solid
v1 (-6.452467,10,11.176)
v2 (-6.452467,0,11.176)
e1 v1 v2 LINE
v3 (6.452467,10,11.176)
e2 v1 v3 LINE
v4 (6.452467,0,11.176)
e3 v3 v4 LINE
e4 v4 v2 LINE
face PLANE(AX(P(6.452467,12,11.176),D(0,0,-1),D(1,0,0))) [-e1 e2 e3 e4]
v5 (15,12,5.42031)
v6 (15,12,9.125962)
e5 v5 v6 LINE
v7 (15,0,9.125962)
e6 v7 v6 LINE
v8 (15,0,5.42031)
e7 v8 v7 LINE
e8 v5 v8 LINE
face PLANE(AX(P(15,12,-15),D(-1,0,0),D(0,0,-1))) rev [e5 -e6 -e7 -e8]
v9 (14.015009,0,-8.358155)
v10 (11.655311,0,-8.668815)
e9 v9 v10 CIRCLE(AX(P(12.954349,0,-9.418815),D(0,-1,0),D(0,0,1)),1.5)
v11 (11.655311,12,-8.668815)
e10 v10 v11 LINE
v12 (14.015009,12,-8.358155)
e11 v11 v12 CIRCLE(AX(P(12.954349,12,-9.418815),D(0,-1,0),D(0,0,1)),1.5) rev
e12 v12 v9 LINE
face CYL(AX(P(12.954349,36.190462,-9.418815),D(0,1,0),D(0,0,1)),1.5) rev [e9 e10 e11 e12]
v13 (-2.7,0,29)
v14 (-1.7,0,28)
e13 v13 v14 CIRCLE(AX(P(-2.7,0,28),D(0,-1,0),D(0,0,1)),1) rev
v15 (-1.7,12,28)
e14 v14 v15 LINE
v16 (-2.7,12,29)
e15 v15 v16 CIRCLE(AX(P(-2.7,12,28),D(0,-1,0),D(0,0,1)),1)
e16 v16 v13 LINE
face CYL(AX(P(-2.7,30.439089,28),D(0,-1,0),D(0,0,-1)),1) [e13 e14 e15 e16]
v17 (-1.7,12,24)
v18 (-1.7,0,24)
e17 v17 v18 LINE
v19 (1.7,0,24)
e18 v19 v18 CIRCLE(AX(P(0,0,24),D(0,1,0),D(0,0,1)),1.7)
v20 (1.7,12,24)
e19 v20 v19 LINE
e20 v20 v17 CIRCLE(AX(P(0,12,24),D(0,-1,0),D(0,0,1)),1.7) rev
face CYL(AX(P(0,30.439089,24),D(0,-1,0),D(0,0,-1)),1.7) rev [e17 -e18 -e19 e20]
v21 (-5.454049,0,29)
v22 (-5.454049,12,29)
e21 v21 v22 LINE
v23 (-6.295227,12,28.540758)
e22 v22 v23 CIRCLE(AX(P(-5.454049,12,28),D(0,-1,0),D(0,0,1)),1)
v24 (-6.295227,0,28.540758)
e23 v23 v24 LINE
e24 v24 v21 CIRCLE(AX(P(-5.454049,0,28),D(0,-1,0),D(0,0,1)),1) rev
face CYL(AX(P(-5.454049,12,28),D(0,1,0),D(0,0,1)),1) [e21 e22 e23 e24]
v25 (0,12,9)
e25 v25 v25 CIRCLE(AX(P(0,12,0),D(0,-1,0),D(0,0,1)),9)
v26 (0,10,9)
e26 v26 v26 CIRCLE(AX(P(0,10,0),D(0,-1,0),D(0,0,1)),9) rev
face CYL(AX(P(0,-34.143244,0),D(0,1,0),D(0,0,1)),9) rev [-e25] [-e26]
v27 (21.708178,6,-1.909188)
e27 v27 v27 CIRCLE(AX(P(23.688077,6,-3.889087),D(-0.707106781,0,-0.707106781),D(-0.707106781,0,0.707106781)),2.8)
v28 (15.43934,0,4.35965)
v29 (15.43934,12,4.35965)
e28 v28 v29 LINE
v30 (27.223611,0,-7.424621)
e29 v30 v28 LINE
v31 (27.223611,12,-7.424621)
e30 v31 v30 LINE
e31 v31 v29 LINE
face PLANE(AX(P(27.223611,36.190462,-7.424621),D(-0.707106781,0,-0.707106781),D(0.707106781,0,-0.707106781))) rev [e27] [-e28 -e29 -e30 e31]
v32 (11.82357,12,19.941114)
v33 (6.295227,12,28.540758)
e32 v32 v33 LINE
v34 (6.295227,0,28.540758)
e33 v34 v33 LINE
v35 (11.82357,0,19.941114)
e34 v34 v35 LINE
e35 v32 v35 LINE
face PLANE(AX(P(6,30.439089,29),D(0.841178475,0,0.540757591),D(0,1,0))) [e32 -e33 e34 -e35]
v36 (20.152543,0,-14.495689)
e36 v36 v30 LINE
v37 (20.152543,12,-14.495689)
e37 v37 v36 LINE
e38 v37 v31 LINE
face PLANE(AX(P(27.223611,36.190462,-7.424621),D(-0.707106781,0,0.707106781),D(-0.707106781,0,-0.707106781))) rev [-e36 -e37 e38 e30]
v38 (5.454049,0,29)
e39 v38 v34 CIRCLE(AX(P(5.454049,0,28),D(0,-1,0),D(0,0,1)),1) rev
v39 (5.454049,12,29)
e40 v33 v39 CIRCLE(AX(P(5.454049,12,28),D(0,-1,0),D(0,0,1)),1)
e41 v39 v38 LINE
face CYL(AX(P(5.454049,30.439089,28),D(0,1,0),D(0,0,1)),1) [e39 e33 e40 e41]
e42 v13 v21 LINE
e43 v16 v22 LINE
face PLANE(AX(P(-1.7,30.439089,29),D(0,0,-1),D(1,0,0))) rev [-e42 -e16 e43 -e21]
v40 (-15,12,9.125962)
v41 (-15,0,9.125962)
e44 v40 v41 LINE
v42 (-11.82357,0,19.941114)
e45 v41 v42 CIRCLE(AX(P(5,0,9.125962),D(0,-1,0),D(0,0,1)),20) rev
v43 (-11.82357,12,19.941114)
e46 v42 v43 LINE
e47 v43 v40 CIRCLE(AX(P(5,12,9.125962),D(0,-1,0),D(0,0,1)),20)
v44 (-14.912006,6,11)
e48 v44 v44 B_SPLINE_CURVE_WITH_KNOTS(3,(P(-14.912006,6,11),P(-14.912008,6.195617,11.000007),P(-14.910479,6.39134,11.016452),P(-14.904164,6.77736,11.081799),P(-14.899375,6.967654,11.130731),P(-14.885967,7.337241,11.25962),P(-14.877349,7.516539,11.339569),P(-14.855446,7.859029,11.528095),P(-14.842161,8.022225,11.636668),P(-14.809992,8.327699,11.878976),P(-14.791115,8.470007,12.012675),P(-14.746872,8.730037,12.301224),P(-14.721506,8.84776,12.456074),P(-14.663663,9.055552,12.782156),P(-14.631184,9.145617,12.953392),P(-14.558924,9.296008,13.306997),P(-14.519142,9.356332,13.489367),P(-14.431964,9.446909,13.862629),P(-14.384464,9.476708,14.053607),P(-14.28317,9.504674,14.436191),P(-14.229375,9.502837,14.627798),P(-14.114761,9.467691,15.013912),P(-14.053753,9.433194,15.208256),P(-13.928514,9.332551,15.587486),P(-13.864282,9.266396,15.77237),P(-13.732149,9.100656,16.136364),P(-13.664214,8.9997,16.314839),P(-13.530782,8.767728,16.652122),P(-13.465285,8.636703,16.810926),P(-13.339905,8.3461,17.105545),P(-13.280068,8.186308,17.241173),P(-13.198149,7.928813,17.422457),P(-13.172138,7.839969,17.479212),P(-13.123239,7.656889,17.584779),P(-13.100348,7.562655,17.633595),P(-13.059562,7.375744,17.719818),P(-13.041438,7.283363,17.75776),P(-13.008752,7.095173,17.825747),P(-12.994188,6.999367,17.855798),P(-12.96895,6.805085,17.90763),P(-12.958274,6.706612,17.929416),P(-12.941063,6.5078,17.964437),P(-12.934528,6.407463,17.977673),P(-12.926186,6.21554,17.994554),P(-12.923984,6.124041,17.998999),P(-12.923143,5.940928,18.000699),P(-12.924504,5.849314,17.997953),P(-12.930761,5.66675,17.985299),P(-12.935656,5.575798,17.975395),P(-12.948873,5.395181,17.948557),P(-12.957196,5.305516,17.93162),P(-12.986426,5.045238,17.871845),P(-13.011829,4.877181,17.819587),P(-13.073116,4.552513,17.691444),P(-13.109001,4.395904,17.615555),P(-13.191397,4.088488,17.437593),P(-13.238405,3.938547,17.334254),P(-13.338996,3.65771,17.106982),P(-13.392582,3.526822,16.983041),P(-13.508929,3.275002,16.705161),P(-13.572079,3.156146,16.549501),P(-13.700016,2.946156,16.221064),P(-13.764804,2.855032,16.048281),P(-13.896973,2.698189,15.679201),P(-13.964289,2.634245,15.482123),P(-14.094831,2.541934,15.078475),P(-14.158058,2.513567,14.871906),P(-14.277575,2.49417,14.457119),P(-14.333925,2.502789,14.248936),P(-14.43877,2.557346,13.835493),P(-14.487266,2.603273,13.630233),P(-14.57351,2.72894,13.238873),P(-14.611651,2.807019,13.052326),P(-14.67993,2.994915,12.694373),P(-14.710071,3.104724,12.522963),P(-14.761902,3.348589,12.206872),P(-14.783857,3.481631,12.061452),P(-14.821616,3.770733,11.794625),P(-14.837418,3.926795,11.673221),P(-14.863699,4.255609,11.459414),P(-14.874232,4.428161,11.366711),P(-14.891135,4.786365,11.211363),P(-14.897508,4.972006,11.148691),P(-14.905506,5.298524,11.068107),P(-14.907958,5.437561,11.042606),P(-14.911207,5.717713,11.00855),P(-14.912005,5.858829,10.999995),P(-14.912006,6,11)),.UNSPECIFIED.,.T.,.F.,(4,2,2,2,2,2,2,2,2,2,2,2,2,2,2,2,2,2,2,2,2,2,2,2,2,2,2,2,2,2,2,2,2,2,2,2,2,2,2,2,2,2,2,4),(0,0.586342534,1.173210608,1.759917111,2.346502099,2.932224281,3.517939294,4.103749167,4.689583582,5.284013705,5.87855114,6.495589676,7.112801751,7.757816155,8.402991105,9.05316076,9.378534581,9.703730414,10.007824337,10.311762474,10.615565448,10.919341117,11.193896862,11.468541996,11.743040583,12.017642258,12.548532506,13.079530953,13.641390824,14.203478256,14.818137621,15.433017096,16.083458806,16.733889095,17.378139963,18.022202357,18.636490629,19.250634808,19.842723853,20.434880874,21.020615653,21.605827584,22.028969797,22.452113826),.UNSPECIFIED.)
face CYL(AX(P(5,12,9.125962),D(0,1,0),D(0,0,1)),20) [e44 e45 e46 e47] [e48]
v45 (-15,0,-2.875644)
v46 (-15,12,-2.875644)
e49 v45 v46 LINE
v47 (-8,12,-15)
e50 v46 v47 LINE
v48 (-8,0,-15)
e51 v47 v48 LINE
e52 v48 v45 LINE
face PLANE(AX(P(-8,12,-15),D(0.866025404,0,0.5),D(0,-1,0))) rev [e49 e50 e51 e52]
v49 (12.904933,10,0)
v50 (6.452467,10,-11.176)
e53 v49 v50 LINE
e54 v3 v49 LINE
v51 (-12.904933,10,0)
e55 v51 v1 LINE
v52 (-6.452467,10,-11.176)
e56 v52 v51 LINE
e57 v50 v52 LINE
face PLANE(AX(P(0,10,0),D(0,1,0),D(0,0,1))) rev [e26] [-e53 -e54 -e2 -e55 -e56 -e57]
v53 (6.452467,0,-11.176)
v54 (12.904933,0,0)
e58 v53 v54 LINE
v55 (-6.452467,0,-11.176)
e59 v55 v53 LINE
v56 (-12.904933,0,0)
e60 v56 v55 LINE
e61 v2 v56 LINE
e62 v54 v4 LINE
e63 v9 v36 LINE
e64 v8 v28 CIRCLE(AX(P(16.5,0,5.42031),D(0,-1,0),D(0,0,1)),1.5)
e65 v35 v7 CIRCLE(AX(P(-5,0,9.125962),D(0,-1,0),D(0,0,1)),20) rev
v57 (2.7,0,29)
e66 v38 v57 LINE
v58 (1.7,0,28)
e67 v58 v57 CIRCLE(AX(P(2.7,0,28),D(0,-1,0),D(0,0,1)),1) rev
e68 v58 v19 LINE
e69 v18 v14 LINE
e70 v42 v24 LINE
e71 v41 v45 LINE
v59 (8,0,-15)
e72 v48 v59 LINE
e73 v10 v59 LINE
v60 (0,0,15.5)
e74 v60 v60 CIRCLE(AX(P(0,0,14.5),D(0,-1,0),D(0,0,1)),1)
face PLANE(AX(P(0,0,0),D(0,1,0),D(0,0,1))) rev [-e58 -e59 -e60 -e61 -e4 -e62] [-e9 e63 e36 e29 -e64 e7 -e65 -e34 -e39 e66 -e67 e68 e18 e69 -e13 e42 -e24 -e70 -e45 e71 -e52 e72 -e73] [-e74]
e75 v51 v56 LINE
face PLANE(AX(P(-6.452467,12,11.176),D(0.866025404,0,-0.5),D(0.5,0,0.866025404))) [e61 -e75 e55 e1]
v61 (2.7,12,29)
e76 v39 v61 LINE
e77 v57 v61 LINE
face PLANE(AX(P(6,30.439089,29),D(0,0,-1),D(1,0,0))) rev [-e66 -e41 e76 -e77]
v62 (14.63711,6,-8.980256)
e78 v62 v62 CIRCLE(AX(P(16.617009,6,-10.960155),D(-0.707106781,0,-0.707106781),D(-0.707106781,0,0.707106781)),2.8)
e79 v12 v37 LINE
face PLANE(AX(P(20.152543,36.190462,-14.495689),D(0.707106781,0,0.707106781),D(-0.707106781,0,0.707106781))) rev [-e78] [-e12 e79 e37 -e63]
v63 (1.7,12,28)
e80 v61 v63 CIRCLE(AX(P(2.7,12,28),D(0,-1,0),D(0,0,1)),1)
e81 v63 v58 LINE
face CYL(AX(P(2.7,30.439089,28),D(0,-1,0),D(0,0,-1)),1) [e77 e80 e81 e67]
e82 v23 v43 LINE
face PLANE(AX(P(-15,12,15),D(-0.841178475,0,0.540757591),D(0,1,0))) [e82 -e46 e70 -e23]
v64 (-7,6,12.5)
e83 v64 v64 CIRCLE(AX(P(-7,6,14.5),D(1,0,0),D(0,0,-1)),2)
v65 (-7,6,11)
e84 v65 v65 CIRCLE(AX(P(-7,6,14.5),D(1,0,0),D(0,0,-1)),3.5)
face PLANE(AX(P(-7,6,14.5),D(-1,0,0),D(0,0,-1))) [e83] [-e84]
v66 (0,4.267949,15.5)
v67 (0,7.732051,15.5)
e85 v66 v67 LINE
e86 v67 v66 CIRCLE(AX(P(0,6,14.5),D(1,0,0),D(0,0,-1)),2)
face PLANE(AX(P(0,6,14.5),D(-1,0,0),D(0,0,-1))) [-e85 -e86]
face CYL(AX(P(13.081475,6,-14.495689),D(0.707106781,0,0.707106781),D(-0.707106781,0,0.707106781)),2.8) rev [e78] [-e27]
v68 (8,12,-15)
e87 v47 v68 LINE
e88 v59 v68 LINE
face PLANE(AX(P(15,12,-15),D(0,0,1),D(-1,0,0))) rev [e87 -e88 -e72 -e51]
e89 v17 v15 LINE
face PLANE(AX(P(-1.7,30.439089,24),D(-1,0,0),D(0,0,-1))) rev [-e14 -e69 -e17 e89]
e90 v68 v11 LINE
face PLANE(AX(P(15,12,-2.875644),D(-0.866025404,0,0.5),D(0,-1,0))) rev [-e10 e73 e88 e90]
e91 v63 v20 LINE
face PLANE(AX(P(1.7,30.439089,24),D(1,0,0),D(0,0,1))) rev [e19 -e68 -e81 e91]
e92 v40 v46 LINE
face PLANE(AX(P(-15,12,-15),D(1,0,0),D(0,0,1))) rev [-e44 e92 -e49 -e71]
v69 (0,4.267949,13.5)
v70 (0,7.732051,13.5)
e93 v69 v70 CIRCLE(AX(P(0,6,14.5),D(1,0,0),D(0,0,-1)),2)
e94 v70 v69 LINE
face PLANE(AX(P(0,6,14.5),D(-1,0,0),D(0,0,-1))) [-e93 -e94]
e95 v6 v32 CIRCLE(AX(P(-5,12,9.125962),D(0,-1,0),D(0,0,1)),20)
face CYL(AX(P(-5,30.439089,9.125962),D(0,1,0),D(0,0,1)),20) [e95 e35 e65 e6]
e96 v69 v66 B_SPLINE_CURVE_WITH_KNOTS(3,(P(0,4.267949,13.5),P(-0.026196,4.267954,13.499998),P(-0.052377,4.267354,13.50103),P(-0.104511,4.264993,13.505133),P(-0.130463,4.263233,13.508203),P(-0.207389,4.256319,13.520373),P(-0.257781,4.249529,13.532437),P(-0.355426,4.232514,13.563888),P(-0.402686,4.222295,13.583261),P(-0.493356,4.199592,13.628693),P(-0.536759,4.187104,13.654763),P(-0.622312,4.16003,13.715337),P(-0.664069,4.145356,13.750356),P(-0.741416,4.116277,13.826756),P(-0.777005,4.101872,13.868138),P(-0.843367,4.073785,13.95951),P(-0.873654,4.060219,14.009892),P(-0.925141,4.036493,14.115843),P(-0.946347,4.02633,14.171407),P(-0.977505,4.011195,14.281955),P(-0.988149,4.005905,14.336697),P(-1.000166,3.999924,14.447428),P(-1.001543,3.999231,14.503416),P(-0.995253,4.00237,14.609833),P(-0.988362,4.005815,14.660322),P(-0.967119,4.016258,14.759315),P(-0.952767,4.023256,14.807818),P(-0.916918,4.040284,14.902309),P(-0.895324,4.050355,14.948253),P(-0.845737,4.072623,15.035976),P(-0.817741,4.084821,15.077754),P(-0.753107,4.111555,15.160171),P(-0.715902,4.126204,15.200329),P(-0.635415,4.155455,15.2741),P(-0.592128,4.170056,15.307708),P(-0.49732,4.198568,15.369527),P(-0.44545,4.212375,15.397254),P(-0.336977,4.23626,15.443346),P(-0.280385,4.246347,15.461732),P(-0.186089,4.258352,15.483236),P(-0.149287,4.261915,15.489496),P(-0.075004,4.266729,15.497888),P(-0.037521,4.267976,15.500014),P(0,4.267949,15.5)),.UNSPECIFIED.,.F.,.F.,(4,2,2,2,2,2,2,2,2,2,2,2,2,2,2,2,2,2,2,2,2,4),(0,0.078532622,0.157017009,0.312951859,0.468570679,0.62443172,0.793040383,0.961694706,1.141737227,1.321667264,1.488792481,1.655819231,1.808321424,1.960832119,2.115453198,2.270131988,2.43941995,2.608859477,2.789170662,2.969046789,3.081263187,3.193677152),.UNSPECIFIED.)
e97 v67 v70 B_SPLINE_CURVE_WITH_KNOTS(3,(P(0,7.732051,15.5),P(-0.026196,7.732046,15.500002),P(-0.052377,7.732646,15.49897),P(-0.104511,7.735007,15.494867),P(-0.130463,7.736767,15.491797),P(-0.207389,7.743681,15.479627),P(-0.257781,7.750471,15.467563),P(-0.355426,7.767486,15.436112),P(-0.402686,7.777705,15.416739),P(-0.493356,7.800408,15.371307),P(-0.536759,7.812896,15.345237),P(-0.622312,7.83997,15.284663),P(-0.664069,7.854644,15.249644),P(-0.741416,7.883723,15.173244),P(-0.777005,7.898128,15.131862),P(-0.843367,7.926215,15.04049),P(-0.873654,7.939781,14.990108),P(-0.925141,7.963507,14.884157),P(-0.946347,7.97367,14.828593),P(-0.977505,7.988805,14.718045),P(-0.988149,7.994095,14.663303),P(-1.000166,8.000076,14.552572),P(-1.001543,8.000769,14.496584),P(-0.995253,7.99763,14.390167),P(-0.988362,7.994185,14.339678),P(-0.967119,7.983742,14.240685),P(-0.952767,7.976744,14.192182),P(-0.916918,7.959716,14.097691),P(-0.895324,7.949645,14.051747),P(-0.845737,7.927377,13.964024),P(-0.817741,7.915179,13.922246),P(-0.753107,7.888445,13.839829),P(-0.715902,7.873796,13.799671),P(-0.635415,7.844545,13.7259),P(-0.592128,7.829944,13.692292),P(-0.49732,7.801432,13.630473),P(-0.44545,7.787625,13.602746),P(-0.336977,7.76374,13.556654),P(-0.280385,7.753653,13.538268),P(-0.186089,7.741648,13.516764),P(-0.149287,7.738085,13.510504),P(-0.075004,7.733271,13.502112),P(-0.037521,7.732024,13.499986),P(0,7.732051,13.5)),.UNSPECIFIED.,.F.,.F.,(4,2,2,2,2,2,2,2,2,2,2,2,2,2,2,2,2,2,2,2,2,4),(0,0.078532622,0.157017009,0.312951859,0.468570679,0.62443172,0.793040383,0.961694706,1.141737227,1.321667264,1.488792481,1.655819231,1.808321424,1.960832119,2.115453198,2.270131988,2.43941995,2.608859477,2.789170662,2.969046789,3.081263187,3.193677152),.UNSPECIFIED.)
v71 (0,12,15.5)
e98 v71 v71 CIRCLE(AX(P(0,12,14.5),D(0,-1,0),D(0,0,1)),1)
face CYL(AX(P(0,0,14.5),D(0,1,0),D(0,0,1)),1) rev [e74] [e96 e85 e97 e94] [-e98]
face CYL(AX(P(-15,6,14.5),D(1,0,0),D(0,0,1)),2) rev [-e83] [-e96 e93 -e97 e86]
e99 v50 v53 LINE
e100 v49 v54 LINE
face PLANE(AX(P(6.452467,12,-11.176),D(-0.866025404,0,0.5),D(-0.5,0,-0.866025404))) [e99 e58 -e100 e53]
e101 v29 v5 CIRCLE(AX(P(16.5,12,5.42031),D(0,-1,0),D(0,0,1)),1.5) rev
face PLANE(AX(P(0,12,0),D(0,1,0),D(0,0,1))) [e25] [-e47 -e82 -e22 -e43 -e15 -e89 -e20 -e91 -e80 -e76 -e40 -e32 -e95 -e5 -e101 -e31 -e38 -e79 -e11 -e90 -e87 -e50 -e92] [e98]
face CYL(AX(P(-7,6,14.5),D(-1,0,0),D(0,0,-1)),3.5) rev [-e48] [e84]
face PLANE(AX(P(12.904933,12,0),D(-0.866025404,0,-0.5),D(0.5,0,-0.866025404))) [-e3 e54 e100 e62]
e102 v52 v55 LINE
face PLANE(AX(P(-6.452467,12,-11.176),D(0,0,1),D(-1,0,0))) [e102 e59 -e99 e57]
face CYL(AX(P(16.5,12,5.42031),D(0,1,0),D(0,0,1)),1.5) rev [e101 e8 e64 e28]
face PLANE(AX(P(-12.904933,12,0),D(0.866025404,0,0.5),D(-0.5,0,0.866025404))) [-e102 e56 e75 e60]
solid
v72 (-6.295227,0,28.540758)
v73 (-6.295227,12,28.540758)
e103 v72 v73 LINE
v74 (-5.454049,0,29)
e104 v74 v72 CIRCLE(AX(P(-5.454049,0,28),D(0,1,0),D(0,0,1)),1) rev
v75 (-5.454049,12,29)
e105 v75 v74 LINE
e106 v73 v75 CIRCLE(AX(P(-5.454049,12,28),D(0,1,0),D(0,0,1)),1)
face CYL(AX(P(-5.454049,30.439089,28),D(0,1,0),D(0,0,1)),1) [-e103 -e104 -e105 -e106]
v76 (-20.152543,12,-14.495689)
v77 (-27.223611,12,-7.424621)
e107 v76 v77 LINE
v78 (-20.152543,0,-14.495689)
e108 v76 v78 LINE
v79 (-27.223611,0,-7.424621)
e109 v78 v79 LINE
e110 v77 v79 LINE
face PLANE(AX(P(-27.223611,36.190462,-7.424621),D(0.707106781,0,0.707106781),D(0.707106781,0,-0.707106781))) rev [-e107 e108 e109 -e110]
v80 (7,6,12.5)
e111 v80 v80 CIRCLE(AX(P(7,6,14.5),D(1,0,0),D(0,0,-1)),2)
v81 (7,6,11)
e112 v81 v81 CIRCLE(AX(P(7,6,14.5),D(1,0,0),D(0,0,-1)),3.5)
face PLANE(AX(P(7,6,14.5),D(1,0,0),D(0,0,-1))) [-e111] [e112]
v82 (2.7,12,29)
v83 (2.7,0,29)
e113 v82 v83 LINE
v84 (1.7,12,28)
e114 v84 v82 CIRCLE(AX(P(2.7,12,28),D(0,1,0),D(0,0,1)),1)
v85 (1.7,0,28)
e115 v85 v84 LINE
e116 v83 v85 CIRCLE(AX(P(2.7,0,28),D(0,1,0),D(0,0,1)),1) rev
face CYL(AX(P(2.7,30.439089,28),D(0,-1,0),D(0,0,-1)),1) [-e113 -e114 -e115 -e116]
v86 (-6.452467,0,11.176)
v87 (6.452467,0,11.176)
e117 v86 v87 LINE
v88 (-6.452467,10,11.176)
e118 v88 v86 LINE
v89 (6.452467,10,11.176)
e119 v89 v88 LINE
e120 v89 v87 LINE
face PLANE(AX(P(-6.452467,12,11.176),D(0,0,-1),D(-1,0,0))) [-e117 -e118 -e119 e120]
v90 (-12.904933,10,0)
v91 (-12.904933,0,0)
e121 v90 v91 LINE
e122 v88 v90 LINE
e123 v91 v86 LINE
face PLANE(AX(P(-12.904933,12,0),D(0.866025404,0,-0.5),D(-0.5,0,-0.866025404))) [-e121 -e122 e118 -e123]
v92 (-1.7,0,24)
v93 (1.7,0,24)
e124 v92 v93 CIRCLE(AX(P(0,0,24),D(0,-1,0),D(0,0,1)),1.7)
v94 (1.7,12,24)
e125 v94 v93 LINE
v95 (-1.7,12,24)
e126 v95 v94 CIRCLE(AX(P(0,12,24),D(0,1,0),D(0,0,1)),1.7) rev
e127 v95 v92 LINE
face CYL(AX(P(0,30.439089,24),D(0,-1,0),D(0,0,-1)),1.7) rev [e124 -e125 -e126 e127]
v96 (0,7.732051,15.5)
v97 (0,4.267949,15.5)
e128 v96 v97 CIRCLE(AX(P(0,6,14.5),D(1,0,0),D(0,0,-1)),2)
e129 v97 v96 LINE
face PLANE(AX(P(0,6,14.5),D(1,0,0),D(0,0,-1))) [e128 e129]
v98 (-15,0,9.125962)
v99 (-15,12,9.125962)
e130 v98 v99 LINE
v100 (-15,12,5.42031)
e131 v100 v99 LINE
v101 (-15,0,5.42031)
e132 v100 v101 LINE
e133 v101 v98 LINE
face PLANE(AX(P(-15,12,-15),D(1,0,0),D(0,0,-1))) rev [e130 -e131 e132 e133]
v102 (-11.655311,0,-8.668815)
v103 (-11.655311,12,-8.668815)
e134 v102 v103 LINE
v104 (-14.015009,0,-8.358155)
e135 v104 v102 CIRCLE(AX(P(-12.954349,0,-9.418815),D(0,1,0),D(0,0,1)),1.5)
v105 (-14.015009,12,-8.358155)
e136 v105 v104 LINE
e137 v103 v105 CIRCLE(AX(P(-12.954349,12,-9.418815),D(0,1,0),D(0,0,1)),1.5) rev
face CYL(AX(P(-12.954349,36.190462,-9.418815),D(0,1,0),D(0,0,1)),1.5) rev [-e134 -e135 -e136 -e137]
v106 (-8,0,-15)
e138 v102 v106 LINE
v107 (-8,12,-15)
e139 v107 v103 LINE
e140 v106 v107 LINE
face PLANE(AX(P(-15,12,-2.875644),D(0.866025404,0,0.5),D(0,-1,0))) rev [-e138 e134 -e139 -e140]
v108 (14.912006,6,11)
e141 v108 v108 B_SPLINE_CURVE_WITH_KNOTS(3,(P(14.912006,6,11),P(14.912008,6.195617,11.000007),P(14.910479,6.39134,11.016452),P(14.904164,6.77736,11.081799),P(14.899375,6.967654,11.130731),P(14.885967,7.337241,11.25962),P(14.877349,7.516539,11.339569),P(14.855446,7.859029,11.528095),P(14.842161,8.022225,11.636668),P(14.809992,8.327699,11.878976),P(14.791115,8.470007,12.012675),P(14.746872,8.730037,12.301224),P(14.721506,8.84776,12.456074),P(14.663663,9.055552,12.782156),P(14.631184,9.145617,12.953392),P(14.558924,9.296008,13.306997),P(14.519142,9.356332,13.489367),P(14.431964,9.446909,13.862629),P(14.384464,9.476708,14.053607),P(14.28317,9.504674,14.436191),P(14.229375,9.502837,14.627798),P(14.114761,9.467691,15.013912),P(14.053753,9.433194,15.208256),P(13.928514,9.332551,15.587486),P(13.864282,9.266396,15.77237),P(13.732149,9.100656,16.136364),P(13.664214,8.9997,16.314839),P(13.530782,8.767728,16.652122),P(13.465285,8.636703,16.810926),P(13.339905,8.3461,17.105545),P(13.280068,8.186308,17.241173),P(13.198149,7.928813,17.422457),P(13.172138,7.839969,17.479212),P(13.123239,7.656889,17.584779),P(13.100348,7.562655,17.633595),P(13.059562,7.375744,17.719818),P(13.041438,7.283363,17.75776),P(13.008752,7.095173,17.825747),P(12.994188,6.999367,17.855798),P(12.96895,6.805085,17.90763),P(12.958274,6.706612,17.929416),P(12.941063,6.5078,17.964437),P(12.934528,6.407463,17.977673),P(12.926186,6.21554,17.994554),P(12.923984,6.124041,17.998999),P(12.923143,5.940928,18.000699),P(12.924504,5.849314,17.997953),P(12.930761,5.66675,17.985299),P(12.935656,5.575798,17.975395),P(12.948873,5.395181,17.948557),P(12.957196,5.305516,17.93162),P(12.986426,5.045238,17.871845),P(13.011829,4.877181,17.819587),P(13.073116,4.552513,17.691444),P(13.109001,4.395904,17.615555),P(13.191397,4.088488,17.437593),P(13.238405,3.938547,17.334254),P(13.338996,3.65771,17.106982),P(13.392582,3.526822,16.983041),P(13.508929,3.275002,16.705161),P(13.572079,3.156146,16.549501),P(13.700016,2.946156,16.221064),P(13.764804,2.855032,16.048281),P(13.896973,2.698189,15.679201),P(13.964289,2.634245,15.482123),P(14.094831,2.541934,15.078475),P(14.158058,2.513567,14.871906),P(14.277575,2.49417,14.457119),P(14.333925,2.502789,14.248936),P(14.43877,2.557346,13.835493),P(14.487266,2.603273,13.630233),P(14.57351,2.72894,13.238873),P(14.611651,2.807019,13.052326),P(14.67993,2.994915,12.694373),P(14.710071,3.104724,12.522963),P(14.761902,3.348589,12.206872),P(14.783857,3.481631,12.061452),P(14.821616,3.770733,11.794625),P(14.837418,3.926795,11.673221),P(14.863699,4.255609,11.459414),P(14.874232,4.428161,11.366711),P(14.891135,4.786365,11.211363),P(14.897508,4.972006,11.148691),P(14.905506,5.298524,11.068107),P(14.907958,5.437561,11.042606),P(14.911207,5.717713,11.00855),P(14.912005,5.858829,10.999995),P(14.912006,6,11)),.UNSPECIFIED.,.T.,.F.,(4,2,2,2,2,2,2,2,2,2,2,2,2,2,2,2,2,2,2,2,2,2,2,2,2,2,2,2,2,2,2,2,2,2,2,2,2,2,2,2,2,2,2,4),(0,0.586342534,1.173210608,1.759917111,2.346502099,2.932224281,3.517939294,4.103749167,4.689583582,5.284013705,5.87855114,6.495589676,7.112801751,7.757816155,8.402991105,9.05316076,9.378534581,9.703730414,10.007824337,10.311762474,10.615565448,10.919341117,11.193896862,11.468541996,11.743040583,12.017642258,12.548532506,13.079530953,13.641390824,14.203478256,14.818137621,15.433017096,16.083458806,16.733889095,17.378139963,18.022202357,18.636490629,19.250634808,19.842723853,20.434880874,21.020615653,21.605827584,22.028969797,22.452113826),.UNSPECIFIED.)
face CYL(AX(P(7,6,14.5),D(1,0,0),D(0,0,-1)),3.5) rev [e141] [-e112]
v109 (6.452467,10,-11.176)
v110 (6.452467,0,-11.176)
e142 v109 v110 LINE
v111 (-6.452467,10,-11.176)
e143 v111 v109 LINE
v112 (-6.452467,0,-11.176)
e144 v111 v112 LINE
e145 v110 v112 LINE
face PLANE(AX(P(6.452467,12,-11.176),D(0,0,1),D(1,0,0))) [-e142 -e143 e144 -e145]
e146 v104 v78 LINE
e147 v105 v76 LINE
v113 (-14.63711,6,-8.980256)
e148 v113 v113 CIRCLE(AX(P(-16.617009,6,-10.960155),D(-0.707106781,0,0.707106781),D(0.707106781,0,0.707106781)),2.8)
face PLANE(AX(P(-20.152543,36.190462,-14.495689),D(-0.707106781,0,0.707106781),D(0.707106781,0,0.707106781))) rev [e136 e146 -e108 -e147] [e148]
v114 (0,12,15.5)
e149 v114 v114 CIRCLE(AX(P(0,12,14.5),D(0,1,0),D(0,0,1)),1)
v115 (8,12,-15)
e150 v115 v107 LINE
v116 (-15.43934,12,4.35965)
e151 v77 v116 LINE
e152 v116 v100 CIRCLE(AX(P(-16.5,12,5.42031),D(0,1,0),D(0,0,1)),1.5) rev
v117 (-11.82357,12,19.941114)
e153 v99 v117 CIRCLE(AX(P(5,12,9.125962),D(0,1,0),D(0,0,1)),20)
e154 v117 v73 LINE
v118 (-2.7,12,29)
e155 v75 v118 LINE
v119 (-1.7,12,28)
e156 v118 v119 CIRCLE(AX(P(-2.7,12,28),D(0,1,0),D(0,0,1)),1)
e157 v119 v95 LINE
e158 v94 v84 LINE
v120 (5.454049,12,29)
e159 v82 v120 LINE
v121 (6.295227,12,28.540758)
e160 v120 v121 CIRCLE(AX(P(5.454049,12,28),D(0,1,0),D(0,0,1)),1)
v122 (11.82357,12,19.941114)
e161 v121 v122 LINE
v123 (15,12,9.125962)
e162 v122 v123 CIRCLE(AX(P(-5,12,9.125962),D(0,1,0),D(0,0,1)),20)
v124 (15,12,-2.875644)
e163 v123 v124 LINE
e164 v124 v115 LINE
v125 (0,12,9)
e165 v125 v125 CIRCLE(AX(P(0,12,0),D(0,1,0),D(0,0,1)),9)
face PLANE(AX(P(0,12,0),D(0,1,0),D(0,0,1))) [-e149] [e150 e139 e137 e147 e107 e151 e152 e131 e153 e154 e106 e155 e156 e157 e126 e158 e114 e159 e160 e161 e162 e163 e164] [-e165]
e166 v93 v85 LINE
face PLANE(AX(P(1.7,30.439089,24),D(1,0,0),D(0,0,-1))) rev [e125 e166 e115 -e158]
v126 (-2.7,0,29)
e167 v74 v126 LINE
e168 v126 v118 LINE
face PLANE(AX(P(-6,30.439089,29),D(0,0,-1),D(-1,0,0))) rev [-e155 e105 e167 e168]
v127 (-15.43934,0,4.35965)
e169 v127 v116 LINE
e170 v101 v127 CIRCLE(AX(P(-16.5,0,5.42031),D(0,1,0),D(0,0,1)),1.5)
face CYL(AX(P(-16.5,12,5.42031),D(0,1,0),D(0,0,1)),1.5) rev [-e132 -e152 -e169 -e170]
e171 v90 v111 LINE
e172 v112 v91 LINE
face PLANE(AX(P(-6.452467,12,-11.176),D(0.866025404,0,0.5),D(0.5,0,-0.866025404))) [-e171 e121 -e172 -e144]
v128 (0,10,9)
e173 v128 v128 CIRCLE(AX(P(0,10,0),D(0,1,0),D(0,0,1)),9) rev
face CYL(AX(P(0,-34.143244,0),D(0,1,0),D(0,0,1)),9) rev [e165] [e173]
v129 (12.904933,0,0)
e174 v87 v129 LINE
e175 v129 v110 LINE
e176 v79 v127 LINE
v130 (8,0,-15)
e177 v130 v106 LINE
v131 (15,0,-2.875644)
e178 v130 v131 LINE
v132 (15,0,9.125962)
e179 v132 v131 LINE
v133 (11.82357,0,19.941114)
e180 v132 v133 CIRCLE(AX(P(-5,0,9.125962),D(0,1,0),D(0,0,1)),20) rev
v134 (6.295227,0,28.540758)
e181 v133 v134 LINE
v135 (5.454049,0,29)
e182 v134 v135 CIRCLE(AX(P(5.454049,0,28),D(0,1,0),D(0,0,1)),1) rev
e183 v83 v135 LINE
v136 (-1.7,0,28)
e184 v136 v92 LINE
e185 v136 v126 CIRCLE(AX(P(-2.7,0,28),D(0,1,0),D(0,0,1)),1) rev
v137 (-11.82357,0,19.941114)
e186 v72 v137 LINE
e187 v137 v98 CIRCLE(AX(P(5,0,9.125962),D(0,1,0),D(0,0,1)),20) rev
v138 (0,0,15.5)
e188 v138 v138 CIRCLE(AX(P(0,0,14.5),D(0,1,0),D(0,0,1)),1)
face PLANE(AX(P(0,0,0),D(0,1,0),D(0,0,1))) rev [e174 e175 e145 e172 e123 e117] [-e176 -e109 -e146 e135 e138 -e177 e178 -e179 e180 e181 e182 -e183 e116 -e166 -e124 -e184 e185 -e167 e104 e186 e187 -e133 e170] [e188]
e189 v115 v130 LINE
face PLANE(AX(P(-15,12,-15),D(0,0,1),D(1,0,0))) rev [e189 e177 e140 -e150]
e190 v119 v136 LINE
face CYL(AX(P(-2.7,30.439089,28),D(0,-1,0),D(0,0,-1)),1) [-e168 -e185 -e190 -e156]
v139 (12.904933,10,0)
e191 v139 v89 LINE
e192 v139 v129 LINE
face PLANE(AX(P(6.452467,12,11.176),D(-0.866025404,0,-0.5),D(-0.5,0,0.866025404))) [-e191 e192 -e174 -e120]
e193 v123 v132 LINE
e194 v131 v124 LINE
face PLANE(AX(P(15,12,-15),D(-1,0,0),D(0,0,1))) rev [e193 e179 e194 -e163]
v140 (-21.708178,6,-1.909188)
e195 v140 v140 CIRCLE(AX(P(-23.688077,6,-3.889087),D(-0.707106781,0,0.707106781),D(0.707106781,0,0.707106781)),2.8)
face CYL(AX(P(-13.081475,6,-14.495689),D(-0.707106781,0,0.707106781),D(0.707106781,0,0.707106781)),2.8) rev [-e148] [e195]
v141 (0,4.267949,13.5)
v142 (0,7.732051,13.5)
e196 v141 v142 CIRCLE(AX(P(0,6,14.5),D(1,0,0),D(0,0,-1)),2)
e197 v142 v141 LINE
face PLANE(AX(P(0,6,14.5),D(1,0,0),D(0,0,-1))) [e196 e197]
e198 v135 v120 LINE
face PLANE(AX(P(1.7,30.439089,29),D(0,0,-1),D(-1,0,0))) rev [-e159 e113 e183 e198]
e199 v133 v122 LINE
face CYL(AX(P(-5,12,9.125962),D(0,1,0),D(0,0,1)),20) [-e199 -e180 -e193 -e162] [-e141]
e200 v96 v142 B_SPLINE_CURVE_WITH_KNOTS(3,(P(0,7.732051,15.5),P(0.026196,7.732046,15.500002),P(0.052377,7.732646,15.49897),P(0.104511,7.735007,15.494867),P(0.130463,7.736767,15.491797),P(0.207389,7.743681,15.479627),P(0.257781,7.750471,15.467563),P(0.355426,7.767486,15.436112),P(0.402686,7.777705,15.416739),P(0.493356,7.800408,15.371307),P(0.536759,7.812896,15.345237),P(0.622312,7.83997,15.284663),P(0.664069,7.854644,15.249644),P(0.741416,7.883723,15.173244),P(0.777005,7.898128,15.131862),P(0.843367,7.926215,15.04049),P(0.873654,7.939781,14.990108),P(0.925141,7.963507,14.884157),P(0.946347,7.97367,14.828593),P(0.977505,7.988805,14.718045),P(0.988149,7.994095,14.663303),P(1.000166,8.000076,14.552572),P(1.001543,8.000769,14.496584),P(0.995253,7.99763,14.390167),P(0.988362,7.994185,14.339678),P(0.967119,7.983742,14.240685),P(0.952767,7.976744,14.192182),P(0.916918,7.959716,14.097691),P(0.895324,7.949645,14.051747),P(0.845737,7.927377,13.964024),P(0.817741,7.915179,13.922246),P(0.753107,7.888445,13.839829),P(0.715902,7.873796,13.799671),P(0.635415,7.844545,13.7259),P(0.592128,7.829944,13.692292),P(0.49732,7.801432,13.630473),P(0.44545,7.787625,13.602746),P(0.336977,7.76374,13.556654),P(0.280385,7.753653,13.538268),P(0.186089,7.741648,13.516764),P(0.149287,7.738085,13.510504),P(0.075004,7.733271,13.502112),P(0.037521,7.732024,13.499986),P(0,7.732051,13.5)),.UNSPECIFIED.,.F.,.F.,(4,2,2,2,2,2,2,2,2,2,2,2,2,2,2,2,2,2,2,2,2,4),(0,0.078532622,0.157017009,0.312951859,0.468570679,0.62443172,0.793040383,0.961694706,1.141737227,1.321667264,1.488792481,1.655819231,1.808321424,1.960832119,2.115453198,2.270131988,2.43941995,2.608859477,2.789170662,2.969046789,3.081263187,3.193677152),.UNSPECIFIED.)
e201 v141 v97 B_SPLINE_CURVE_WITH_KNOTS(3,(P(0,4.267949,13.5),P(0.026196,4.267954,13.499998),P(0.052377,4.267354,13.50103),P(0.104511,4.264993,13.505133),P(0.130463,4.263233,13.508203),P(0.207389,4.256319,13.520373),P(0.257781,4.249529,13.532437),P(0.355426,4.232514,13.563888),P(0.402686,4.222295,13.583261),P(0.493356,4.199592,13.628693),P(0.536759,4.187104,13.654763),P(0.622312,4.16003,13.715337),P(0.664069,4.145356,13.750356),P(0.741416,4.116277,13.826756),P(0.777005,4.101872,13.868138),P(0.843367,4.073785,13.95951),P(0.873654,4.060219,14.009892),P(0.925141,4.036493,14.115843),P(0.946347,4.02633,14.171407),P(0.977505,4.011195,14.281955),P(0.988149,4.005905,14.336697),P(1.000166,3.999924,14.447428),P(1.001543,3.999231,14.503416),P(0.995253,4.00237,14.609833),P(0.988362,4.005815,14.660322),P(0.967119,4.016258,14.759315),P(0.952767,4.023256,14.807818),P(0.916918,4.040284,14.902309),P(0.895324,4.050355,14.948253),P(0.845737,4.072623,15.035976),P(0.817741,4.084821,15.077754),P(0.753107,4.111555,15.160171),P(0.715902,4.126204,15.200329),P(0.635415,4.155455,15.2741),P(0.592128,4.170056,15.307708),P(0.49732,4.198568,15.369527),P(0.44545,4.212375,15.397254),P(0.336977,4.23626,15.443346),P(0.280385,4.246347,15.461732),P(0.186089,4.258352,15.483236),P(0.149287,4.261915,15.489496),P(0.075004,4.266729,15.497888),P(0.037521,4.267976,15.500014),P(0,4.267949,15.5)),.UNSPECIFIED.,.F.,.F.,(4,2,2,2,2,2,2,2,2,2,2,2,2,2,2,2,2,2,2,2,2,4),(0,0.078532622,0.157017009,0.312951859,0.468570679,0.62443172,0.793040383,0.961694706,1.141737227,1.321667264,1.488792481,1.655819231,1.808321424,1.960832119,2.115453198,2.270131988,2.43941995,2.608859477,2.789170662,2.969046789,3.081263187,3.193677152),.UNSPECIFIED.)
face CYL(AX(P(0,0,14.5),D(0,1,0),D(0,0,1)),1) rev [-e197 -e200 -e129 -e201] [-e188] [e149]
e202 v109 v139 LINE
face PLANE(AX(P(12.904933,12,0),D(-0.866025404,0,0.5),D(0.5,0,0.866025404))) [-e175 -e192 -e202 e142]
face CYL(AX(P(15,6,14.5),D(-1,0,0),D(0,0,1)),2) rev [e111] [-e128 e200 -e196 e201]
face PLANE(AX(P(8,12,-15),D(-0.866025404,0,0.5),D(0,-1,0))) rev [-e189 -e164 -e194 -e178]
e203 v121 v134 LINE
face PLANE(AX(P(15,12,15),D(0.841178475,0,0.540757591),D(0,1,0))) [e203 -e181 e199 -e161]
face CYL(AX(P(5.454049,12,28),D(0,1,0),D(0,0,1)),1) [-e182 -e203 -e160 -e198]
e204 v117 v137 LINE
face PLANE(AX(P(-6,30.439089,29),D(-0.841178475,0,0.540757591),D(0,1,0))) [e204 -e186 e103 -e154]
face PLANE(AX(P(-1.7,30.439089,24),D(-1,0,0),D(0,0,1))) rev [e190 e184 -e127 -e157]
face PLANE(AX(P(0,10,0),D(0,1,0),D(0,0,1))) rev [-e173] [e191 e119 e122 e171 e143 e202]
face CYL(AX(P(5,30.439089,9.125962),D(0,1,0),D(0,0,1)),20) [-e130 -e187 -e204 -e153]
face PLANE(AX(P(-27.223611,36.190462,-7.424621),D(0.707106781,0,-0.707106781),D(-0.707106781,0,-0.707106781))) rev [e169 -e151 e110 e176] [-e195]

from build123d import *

# Parameters (mm, degrees)
SKETCH1_W           = 30
SKETCH1_H           = 30
BOSS_EXTRUDE1_DEPTH = 12
BOSS_EXTRUDE6_DEPTH = 12
CHAMFER1_SIZE       = 7
CHAMFER1_SIZE2      = 12.124355653
BOSS_EXTRUDE4_DEPTH = 12
SKETCH7_R           = 2.8
CUT_EXTRUDE2_DEPTH  = 15
CHAMFER2_SIZE       = 9
CHAMFER2_SIZE_2     = 14
CHAMFER3_SIZE       = 14
CHAMFER3_SIZE_2     = 9
FILLET2_R           = 20
FILLET3_R           = 1
FILLET4_R           = 1.5
SKETCH10_R          = 1
CUT_EXTRUDE3_DEPTH  = 42.546660516
SKETCH11_R          = 2
CUT_EXTRUDE4_DEPTH  = 42.546660516
SKETCH12_R          = 9
BOSS_EXTRUDE8_DEPTH = 2
SKETCH13_R          = 3.5
CUT_EXTRUDE5_DEPTH  = 8


with BuildPart() as part:
    # Sketch1 → Boss-Extrude1 (new body)
    with BuildSketch(Plane(origin=(0, 0, 0), x_dir=(1, 0, 0), z_dir=(0, 1, 0))):
        Rectangle(SKETCH1_W, SKETCH1_H)
        Polygon((6.452466608, -11.176), (12.904933217, 0), (6.452466608, 11.176), (-6.452466608, 11.176), (-12.904933217, 0), (-6.452466608, -11.176), align=None, mode=Mode.SUBTRACT)
    extrude(amount=BOSS_EXTRUDE1_DEPTH)

    # Sketch8 → Boss-Extrude6 (add)
    with BuildSketch(Plane(origin=(0, 0, 0), x_dir=(1, 0, 0), z_dir=(0, 1, 0))):
        with BuildLine():
            Line((-6, -15), (6, -15))
            Line((6, -15), (6, -29))
            Line((6, -29), (1.7, -29))
            Line((1.7, -29), (1.7, -24))
            ThreePointArc((1.7, -24), (0, -22.3), (-1.7, -24))
            Line((-1.7, -24), (-1.7, -29))
            Line((-1.7, -29), (-6, -29))
            Line((-6, -29), (-6, -15))
        make_face()
    extrude(amount=BOSS_EXTRUDE6_DEPTH)

    # Chamfer1
    chamfer1_edges = [part.edges().sort_by_distance(p)[0] for p in [
        (-15, 6, -15),
        (15, 6, -15),
    ]]
    chamfer1_side = [part.faces().sort_by_distance(p)[0] for p in [
        (0, 6, -15),
    ]]
    chamfer(chamfer1_edges, length=CHAMFER1_SIZE, length2=CHAMFER1_SIZE2, reference=chamfer1_side[0])

    # Sketch6 → Boss-Extrude4 (add)
    with BuildSketch(Plane(origin=(0, 0, 0), x_dir=(1, 0, 0), z_dir=(0, 1, 0))):
        Polygon((-27.223611076, 7.424621202), (-15, -4.798989873), (-15, 2.875644347), (-12.632730187, 6.975875938), (-20.152543264, 14.495689014), align=None)
    extrude(amount=BOSS_EXTRUDE4_DEPTH)

    # Sketch7 → Cut-Extrude2 (cut)
    with BuildSketch(Plane(origin=(-9.899494937, 0, 9.899494937), x_dir=(0.7071067811865438, 0, 0.7071067811865512), z_dir=(-0.7071067811865512, 0, 0.7071067811865438))):
        with Locations((-19.5, 6)):
            Circle(SKETCH7_R)
    extrude(amount=-CUT_EXTRUDE2_DEPTH, mode=Mode.SUBTRACT)

    # Chamfer2
    # the kernel refuses this chamfer: 14, 9 mm, written as the material it adds along each edge
    with BuildSketch(Plane(origin=(6, 0, 15), x_dir=(0.9987204462012896, 0, -0.05057143798130468), z_dir=(0, 1, 0))) as chamfer2_piece_1:
        Polygon((CHAMFER2_SIZE * 0.998720446201, -CHAMFER2_SIZE * 0.0505714379813), (-CHAMFER2_SIZE_2 * 0.0505714379813, -CHAMFER2_SIZE_2 * 0.998720446201), (0, 0), align=None)
    extrude(amount=12)

    # Chamfer3
    # the kernel refuses this chamfer: 14, 9 mm, written as the material it adds along each edge
    with BuildSketch(Plane(origin=(-6, 0, 15), x_dir=(0.020921616646829202, 0, 0.9997811190240007), z_dir=(0, 1, 0))) as chamfer3_piece_1:
        Polygon((CHAMFER3_SIZE * 0.999781119024, -CHAMFER3_SIZE * 0.0209216166468), (-CHAMFER3_SIZE_2 * 0.0209216166468, -CHAMFER3_SIZE_2 * 0.999781119024), (0, 0), align=None)
    extrude(amount=12)

    # Fillet2
    fillet2_edges = [part.edges().sort_by_distance(p)[0] for p in [
        (15, 6, 15),
        (-15, 6, 15),
    ]]
    fillet(fillet2_edges, radius=FILLET2_R)

    # Fillet3
    fillet3_edges = [part.edges().sort_by_distance(p)[0] for p in [
        (-6, 6, 29),
        (-1.7, 6, 29),
        (1.7, 6, 29),
        (6, 6, 29),
    ]]
    fillet(fillet3_edges, radius=FILLET3_R)

    # Fillet4
    fillet4_edges = [part.edges().sort_by_distance(p)[0] for p in [
        (-15, 6, 4.798989873),
        (-12.632730187, 6, -6.975875938),
    ]]
    fillet(fillet4_edges, radius=FILLET4_R)

    # Sketch10 → Cut-Extrude3 (cut, through all)
    with BuildSketch(Plane(origin=(0, 12, 0), x_dir=(1, 0, 0), z_dir=(0, 1, 0))):
        with Locations(Location((0, -14.5, 0), (0, 0, 270))):
            Circle(SKETCH10_R)
    extrude(amount=-CUT_EXTRUDE3_DEPTH, mode=Mode.SUBTRACT)

    # Sketch11 → Cut-Extrude4 (cut, through all)
    with BuildSketch(Plane(origin=(0, 0, 0), x_dir=(0, 0, -1), z_dir=(1, 0, 0))):
        with Locations(Location((-14.5, 6, 0), (0, 0, 180))):
            Circle(SKETCH11_R)
    extrude(amount=CUT_EXTRUDE4_DEPTH, mode=Mode.SUBTRACT)

    # Sketch12 → Boss-Extrude8 (add)
    with BuildSketch(Plane(origin=(0, 12, 0), x_dir=(1, 0, 0), z_dir=(0, 1, 0))):
        Polygon((6.452466608, 11.176), (-6.452466608, 11.176), (-12.904933217, 0), (-6.452466608, -11.176), (6.452466608, -11.176), (12.904933217, 0), align=None)
        with Locations(Location((0, 0, 0), (0, 0, 270))):
            Circle(SKETCH12_R, mode=Mode.SUBTRACT)
    extrude(amount=-BOSS_EXTRUDE8_DEPTH)

    # Sketch13 → Cut-Extrude5 (cut)
    with BuildSketch(Plane(origin=(15, 0, 0), x_dir=(0, 0, -1), z_dir=(1, 0, 0))):
        with Locations((-14.5, 6)):
            Circle(SKETCH13_R)
    extrude(amount=-CUT_EXTRUDE5_DEPTH, mode=Mode.SUBTRACT)


with BuildPart() as body_2:
    # Mirror2: mirrored copy
    add(part.part.mirror(Plane(origin=(0, 0, 0), x_dir=(0, 0, 1), z_dir=(1, 0, 0))))


solid = Compound([part.part, body_2.part])
